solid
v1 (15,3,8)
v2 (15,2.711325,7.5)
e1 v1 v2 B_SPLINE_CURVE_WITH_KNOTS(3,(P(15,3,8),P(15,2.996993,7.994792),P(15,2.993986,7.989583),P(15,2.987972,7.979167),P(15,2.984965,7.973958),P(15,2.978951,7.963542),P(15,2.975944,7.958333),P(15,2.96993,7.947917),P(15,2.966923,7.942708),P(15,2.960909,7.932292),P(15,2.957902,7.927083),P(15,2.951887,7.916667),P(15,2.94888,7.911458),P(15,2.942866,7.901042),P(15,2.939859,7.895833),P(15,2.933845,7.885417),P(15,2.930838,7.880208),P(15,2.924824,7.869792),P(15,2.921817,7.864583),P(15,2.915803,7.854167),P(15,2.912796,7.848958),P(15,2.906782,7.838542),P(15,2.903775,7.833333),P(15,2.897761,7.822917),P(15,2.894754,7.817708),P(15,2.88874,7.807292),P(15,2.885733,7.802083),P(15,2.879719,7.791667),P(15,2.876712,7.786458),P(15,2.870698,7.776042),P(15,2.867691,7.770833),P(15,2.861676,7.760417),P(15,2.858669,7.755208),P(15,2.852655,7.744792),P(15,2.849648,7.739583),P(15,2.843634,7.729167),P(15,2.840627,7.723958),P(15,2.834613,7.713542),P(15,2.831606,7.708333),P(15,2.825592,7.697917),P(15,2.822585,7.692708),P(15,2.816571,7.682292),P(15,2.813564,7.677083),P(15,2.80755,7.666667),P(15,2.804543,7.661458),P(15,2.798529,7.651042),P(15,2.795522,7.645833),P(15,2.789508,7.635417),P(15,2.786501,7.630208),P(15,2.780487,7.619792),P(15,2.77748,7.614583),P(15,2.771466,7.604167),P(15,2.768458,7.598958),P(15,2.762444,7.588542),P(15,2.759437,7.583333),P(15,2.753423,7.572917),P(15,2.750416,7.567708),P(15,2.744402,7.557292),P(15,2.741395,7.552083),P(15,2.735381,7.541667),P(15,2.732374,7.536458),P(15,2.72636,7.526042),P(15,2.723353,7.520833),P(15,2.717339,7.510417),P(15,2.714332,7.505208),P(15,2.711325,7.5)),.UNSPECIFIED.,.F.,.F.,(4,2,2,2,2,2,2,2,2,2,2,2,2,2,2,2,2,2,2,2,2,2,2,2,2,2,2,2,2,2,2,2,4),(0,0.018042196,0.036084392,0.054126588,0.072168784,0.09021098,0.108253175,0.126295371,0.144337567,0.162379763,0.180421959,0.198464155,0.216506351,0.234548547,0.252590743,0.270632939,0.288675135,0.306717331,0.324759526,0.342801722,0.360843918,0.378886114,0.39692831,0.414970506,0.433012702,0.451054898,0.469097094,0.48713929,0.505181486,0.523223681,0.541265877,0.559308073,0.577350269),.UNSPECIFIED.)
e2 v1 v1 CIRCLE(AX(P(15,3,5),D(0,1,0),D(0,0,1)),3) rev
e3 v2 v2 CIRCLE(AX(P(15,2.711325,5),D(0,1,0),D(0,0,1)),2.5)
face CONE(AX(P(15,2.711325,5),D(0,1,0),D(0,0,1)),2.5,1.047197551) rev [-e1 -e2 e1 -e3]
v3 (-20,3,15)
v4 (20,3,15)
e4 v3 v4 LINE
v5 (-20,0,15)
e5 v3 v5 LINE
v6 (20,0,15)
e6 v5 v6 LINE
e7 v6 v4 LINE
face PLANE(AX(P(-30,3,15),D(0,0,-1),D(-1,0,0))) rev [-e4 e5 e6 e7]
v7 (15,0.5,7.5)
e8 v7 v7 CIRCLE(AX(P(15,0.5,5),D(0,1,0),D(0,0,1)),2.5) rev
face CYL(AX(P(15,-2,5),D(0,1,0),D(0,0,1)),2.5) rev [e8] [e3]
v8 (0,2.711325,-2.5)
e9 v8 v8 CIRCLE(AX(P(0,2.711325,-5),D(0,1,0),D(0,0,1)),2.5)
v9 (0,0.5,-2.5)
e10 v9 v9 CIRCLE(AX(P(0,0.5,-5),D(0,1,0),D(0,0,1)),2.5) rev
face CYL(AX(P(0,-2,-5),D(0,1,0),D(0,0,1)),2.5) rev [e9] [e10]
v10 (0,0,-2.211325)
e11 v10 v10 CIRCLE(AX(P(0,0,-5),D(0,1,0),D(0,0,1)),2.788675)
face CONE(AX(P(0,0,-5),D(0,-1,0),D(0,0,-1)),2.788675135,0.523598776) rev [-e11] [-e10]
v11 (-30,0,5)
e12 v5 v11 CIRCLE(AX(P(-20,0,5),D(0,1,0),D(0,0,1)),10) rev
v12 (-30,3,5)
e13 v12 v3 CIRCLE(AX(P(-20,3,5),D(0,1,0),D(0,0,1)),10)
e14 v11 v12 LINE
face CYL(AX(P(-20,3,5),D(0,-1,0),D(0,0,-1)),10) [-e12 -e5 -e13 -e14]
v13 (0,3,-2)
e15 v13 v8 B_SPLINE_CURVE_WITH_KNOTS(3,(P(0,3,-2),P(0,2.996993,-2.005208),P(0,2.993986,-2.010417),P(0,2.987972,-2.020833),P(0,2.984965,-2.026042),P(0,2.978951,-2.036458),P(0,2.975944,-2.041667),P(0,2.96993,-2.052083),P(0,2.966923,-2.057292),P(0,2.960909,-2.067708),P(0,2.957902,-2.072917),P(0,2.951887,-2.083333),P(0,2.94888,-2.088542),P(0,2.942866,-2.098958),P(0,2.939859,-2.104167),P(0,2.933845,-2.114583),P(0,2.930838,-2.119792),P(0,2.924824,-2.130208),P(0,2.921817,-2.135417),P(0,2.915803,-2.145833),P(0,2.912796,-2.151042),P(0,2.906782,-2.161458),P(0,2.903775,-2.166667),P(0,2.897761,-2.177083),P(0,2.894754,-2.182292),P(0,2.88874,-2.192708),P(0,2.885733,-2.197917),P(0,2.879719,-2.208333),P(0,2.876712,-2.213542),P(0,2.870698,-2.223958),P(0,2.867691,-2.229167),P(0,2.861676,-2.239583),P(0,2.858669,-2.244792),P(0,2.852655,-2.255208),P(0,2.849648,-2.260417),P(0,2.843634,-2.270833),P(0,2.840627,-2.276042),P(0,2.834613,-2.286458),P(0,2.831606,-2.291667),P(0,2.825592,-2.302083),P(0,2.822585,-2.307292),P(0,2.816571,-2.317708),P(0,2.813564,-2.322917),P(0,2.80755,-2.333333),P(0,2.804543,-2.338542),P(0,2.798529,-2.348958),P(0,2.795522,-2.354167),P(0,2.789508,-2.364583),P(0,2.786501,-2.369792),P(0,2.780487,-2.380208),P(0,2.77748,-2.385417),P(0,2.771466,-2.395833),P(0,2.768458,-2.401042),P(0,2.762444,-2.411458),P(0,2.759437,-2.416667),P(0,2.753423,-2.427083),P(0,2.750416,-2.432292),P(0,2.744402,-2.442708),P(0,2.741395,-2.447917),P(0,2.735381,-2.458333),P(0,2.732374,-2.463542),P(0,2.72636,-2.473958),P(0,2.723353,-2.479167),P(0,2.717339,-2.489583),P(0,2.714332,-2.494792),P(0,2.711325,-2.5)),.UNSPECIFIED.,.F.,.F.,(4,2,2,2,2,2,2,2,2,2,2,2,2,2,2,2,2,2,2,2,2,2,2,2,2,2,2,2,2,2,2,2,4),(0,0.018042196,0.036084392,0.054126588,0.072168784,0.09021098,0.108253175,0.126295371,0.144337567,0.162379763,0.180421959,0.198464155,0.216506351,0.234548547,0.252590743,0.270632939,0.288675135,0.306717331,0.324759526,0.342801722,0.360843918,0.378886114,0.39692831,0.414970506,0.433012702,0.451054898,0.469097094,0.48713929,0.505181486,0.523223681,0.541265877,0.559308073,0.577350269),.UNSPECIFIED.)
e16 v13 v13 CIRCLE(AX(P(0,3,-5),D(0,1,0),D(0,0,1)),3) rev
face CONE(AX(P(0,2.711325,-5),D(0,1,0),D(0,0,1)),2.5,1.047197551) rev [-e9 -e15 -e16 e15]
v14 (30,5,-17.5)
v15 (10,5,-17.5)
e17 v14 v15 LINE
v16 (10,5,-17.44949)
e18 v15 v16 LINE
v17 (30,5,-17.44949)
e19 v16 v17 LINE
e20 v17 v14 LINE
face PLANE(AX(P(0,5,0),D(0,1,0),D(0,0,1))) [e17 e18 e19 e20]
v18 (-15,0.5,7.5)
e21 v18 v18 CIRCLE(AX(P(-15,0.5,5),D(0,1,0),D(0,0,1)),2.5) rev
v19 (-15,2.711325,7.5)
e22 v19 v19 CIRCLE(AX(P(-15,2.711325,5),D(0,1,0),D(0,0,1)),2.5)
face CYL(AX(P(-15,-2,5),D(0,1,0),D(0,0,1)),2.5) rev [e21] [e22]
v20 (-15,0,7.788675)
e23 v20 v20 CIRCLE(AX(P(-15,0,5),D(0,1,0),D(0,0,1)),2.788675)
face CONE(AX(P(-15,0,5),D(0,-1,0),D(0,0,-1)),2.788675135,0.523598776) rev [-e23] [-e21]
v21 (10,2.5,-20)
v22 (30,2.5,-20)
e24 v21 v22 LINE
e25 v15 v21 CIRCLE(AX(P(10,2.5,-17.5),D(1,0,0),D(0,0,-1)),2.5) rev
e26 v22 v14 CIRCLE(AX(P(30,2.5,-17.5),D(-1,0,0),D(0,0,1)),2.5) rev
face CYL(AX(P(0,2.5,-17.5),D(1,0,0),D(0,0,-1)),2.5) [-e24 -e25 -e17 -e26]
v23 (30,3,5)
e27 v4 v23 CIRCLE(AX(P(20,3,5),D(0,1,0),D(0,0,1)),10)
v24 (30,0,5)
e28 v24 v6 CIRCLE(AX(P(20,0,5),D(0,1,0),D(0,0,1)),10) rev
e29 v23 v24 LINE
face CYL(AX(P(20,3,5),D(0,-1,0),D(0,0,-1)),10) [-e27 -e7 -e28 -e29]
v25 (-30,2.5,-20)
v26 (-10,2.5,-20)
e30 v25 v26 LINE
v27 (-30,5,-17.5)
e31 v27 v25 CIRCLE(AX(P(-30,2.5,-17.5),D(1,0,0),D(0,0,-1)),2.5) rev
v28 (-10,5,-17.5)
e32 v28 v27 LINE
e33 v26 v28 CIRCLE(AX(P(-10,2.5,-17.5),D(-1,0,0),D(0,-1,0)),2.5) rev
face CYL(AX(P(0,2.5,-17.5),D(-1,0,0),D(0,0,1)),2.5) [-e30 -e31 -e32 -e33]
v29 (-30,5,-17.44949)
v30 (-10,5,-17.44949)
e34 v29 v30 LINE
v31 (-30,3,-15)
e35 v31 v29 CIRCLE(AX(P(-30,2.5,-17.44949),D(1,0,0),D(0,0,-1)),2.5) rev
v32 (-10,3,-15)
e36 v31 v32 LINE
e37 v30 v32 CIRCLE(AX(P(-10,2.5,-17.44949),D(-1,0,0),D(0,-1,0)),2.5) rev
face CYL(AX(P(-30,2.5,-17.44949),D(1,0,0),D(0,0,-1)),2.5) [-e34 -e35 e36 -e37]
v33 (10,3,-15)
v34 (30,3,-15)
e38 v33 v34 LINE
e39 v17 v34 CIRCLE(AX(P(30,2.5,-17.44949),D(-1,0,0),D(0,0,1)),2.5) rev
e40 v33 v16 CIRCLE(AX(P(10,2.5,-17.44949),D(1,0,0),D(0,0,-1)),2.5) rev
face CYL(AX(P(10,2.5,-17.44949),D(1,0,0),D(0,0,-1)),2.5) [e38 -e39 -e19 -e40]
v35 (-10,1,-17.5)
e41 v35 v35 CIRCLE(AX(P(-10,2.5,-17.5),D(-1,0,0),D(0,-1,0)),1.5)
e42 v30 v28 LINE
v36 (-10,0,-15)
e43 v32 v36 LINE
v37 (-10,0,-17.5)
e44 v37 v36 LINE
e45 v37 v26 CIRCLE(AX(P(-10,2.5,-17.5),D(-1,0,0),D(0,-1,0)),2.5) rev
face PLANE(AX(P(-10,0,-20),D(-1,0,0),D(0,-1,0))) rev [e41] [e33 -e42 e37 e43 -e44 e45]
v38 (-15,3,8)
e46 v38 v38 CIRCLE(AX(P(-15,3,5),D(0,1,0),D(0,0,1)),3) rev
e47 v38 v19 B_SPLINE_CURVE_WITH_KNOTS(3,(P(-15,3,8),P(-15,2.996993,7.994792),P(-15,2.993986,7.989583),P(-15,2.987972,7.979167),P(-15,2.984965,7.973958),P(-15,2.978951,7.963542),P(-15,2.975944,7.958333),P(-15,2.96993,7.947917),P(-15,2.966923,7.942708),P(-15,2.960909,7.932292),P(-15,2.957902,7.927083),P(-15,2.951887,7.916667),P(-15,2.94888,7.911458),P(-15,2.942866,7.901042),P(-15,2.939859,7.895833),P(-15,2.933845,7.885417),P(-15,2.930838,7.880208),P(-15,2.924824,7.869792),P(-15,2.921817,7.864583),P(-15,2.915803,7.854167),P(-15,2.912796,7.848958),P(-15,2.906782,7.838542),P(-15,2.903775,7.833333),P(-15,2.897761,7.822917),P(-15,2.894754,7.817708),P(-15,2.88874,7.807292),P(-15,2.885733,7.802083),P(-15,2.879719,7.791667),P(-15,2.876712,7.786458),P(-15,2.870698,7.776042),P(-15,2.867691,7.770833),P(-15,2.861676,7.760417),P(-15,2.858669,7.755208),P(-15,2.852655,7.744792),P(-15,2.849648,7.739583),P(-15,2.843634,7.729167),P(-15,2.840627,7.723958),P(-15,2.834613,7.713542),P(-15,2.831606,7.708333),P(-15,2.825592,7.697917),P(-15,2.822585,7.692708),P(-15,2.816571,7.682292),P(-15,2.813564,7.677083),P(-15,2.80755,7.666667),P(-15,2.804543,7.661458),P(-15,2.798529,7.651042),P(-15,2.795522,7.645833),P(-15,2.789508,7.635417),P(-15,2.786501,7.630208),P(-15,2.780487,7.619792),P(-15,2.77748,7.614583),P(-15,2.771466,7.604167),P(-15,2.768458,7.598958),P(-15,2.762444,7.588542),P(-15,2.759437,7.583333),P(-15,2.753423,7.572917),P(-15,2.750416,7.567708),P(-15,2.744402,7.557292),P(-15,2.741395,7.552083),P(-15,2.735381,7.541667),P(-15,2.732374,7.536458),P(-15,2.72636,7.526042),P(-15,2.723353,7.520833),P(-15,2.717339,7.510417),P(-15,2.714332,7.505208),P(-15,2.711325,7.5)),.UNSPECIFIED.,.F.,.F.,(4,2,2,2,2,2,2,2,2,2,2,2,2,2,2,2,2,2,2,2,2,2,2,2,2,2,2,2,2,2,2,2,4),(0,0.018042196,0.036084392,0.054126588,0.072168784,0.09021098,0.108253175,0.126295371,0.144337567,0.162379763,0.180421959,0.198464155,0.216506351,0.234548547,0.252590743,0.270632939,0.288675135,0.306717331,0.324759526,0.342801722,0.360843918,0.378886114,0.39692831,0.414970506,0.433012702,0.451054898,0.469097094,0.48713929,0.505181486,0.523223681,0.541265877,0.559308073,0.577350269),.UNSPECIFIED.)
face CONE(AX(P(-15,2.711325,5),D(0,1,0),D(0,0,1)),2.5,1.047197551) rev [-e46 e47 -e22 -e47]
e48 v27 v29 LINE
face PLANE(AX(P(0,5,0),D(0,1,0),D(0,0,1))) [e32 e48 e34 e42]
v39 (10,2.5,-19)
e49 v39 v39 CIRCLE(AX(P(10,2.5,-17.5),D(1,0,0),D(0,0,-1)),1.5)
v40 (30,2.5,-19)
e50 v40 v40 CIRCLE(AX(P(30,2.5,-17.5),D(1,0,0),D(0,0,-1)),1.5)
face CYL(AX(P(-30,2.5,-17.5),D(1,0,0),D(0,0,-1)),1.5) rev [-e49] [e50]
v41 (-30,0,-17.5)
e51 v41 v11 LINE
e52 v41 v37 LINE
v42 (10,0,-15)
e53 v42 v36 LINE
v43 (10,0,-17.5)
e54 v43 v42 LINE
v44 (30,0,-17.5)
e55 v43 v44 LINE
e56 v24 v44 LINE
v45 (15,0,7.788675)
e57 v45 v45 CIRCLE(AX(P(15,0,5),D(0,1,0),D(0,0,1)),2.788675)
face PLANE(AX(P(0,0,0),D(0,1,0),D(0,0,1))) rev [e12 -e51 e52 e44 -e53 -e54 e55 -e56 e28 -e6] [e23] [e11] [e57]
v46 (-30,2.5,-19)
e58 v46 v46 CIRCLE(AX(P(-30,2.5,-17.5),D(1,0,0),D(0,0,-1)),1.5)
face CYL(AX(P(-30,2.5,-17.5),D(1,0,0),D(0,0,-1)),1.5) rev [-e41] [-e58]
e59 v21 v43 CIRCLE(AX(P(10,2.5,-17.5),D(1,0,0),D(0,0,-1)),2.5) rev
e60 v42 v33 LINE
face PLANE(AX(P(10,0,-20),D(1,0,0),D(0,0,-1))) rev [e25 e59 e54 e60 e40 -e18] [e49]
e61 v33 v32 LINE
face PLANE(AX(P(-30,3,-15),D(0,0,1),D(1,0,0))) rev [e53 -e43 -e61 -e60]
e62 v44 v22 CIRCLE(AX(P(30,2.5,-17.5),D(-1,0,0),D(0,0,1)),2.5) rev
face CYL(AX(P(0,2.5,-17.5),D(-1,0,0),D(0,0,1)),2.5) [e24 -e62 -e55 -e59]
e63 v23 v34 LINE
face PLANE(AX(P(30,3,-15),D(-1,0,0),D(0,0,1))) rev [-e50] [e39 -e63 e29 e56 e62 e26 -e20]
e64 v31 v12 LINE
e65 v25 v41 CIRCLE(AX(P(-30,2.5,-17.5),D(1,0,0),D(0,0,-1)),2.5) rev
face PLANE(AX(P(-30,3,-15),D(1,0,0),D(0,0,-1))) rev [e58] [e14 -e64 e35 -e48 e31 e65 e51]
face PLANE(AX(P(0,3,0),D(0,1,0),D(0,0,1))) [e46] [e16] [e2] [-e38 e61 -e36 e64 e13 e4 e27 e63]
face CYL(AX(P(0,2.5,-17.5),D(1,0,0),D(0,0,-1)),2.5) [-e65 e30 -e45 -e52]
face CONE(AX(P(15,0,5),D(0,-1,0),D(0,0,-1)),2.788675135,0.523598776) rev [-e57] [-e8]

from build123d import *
from OCP.BRepFilletAPI import BRepFilletAPI_MakeChamfer

# Parameters (mm, degrees)
SZKIC1_W                    = 60
SZKIC1_H                    = 30
DODANIE_WYCI_GNI_CIE1_DEPTH = 3
SZKIC2_R                    = 2.5
WYTNIJ_WYCI_GNI_CIE1_DEPTH  = 5
SZKIC4_W                    = 20
SZKIC4_H                    = 3
DODANIE_WYCI_GNI_CIE2_DEPTH = 5
SZKIC5_W                    = 20
SZKIC5_H                    = 5
DODANIE_WYCI_GNI_CIE3_DEPTH = 2
ZAOKR_GLENIE1_R             = 2.5
SZKIC6_R                    = 1.5
WYTNIJ_WYCI_GNI_CIE2_DEPTH  = 60
ZAOKR_GLENIE2_R             = 10
SFAZOWANIE1_SIZE            = 0.5
SFAZOWANIE1_SIZE2           = 0.288675135


with BuildPart() as part:
    # Szkic1 → Dodanie-wyciągnięcie1 (new body)
    with BuildSketch(Plane(origin=(0, 0, 0), x_dir=(1, 0, 0), z_dir=(0, 1, 0))):
        Rectangle(SZKIC1_W, SZKIC1_H)
    extrude(amount=DODANIE_WYCI_GNI_CIE1_DEPTH)

    # Szkic2 → Wytnij-wyciągnięcie1 (cut)
    with BuildSketch(Plane(origin=(0, 3, 0), x_dir=(1, 0, 0), z_dir=(0, 1, 0))):
        with Locations(Location((-15, -5, 0), (0, 0, 270))):
            Circle(SZKIC2_R)
        with Locations(Location((15, -5, 0), (0, 0, 270))):
            Circle(SZKIC2_R)
        with Locations(Location((0, 5, 0), (0, 0, 270))):
            Circle(SZKIC2_R)
    extrude(amount=-WYTNIJ_WYCI_GNI_CIE1_DEPTH, mode=Mode.SUBTRACT)

    # Szkic4 → Dodanie-wyciągnięcie2 (add)
    with BuildSketch(Plane(origin=(0, 0, -15), x_dir=(-1, 0, 0), z_dir=(0, 0, -1))):
        with Locations((-20, 1.5)):
            Rectangle(SZKIC4_W, SZKIC4_H)
        with Locations((20, 1.5)):
            Rectangle(SZKIC4_W, SZKIC4_H)
    extrude(amount=DODANIE_WYCI_GNI_CIE2_DEPTH)

    # Szkic5 → Dodanie-wyciągnięcie3 (add)
    with BuildSketch(Plane(origin=(0, 3, 0), x_dir=(1, 0, 0), z_dir=(0, 1, 0))):
        with Locations((-20, 17.5)):
            Rectangle(SZKIC5_W, SZKIC5_H)
        with Locations((20, 17.5)):
            Rectangle(SZKIC5_W, SZKIC5_H)
    extrude(amount=DODANIE_WYCI_GNI_CIE3_DEPTH)

    # Zaokrąglenie1
    # the kernel refuses this fillet: 2.5 mm, written as the material it takes off along each edge
    with BuildSketch(Plane(origin=(-36.25, 0, -20), x_dir=(0, 1, 0), z_dir=(1, 0, 0)), Plane(origin=(-36.25, 5, -20), x_dir=(0, 0, 1), z_dir=(1, 0, 0)), Plane(origin=(3.75, 5, -20), x_dir=(0, 0, 1), z_dir=(1, 0, 0))) as zaokr_glenie1_piece_1:
        with BuildLine():
            CenterArc((ZAOKR_GLENIE1_R, ZAOKR_GLENIE1_R), ZAOKR_GLENIE1_R, 180, 90)
            Line((0, ZAOKR_GLENIE1_R), (-ZAOKR_GLENIE1_R * 0.02, ZAOKR_GLENIE1_R))
            Line((-ZAOKR_GLENIE1_R * 0.02, ZAOKR_GLENIE1_R), (-ZAOKR_GLENIE1_R * 0.02, -ZAOKR_GLENIE1_R * 0.02))
            Line((-ZAOKR_GLENIE1_R * 0.02, -ZAOKR_GLENIE1_R * 0.02), (ZAOKR_GLENIE1_R, -ZAOKR_GLENIE1_R * 0.02))
            Line((ZAOKR_GLENIE1_R, -ZAOKR_GLENIE1_R * 0.02), (ZAOKR_GLENIE1_R, 0))
        make_face()
    extrude(amount=32.5, mode=Mode.SUBTRACT)
    with BuildSketch(Plane(origin=(-3.876275643, 5, -15), x_dir=(0, -1.0, -1.666222715356868e-12), z_dir=(-1, 0, 0)), Plane(origin=(36.123724357, 5, -15), x_dir=(0, -1.0, -1.666222715356868e-12), z_dir=(-1, 0, 0))) as zaokr_glenie1_piece_2:
        with BuildLine():
            CenterArc((2.5, -2.449489743), ZAOKR_GLENIE1_R, 101.536959033, 78.463040967)
            Line((0, -2.449489743), (-0.05, -2.449489743))
            Line((-0.05, -2.449489743), (-0.05, 0))
            Line((-0.05, 0), (0, 0.05))
            ThreePointArc((0, 0.05), (1, 0.05), (1.99, 0.048989795))
            Line((1.99, 0.048989795), (2, 0))
        make_face()
    extrude(amount=32.247448714, mode=Mode.SUBTRACT)
    with BuildSketch(Plane(origin=(36.25, 0, -20), x_dir=(0, 1, 0), z_dir=(-1, 0, 0))) as zaokr_glenie1_piece_3:
        with BuildLine():
            CenterArc((ZAOKR_GLENIE1_R, -ZAOKR_GLENIE1_R), ZAOKR_GLENIE1_R, 90, 90)
            Line((0, -ZAOKR_GLENIE1_R), (-ZAOKR_GLENIE1_R * 0.02, -ZAOKR_GLENIE1_R))
            Line((-ZAOKR_GLENIE1_R * 0.02, -ZAOKR_GLENIE1_R), (-ZAOKR_GLENIE1_R * 0.02, ZAOKR_GLENIE1_R * 0.02))
            Line((-ZAOKR_GLENIE1_R * 0.02, ZAOKR_GLENIE1_R * 0.02), (ZAOKR_GLENIE1_R, ZAOKR_GLENIE1_R * 0.02))
            Line((ZAOKR_GLENIE1_R, ZAOKR_GLENIE1_R * 0.02), (ZAOKR_GLENIE1_R, 0))
        make_face()
    extrude(amount=32.5, mode=Mode.SUBTRACT)

    # Szkic6 → Wytnij-wyciągnięcie2 (cut)
    with BuildSketch(Plane(origin=(30, 0, 0), x_dir=(0, 0, -1), z_dir=(1, 0, 0))):
        with Locations((17.5, 2.5)):
            Circle(SZKIC6_R)
    extrude(amount=-WYTNIJ_WYCI_GNI_CIE2_DEPTH, mode=Mode.SUBTRACT)

    # Zaokrąglenie2
    zaokr_glenie2_edges = [part.edges().sort_by_distance(p)[0] for p in [
        (30, 1.5, 15),
        (-30, 1.5, 15),
    ]]
    fillet(zaokr_glenie2_edges, radius=ZAOKR_GLENIE2_R)

    # Sfazowanie1: one chamfer whose edges measure the first distance from different faces: ONE call of the kernel's chamfer builder (chamfer() names one face for all edges)
    sfazowanie1_edges_1 = [part.edges().sort_by_distance(p)[0] for p in [
        (-15, 0, 2.5),
    ]]
    sfazowanie1_side_1 = [part.faces().sort_by_distance(p)[0] for p in [
        (-15, 1.5, 2.5),
    ]]
    sfazowanie1_edges_2 = [part.edges().sort_by_distance(p)[0] for p in [
        (-15, 3, 2.5),
        (15, 3, 2.5),
        (0, 3, -7.5),
    ]]
    sfazowanie1_side_2 = [part.faces().sort_by_distance(p)[0] for p in [
        (0, 3, -0.380473171),
    ]]
    sfazowanie1_edges_3 = [part.edges().sort_by_distance(p)[0] for p in [
        (15, 0, 2.5),
    ]]
    sfazowanie1_side_3 = [part.faces().sort_by_distance(p)[0] for p in [
        (15, 1.5, 2.5),
    ]]
    sfazowanie1_edges_4 = [part.edges().sort_by_distance(p)[0] for p in [
        (0, 0, -7.5),
    ]]
    sfazowanie1_side_4 = [part.faces().sort_by_distance(p)[0] for p in [
        (0, 1.5, -7.5),
    ]]
    sfazowanie1 = BRepFilletAPI_MakeChamfer(part.part.solid().wrapped)
    for e in sfazowanie1_edges_1:
        sfazowanie1.Add(SFAZOWANIE1_SIZE, SFAZOWANIE1_SIZE2, e.wrapped, sfazowanie1_side_1[0].wrapped)  # the first distance lies on this face
    for e in sfazowanie1_edges_2:
        sfazowanie1.Add(SFAZOWANIE1_SIZE, SFAZOWANIE1_SIZE2, e.wrapped, sfazowanie1_side_2[0].wrapped)  # the first distance lies on this face
    for e in sfazowanie1_edges_3:
        sfazowanie1.Add(SFAZOWANIE1_SIZE, SFAZOWANIE1_SIZE2, e.wrapped, sfazowanie1_side_3[0].wrapped)  # the first distance lies on this face
    for e in sfazowanie1_edges_4:
        sfazowanie1.Add(SFAZOWANIE1_SIZE, SFAZOWANIE1_SIZE2, e.wrapped, sfazowanie1_side_4[0].wrapped)  # the first distance lies on this face
    add(Compound.cast(sfazowanie1.Shape()), mode=Mode.REPLACE)


solid = part.part
